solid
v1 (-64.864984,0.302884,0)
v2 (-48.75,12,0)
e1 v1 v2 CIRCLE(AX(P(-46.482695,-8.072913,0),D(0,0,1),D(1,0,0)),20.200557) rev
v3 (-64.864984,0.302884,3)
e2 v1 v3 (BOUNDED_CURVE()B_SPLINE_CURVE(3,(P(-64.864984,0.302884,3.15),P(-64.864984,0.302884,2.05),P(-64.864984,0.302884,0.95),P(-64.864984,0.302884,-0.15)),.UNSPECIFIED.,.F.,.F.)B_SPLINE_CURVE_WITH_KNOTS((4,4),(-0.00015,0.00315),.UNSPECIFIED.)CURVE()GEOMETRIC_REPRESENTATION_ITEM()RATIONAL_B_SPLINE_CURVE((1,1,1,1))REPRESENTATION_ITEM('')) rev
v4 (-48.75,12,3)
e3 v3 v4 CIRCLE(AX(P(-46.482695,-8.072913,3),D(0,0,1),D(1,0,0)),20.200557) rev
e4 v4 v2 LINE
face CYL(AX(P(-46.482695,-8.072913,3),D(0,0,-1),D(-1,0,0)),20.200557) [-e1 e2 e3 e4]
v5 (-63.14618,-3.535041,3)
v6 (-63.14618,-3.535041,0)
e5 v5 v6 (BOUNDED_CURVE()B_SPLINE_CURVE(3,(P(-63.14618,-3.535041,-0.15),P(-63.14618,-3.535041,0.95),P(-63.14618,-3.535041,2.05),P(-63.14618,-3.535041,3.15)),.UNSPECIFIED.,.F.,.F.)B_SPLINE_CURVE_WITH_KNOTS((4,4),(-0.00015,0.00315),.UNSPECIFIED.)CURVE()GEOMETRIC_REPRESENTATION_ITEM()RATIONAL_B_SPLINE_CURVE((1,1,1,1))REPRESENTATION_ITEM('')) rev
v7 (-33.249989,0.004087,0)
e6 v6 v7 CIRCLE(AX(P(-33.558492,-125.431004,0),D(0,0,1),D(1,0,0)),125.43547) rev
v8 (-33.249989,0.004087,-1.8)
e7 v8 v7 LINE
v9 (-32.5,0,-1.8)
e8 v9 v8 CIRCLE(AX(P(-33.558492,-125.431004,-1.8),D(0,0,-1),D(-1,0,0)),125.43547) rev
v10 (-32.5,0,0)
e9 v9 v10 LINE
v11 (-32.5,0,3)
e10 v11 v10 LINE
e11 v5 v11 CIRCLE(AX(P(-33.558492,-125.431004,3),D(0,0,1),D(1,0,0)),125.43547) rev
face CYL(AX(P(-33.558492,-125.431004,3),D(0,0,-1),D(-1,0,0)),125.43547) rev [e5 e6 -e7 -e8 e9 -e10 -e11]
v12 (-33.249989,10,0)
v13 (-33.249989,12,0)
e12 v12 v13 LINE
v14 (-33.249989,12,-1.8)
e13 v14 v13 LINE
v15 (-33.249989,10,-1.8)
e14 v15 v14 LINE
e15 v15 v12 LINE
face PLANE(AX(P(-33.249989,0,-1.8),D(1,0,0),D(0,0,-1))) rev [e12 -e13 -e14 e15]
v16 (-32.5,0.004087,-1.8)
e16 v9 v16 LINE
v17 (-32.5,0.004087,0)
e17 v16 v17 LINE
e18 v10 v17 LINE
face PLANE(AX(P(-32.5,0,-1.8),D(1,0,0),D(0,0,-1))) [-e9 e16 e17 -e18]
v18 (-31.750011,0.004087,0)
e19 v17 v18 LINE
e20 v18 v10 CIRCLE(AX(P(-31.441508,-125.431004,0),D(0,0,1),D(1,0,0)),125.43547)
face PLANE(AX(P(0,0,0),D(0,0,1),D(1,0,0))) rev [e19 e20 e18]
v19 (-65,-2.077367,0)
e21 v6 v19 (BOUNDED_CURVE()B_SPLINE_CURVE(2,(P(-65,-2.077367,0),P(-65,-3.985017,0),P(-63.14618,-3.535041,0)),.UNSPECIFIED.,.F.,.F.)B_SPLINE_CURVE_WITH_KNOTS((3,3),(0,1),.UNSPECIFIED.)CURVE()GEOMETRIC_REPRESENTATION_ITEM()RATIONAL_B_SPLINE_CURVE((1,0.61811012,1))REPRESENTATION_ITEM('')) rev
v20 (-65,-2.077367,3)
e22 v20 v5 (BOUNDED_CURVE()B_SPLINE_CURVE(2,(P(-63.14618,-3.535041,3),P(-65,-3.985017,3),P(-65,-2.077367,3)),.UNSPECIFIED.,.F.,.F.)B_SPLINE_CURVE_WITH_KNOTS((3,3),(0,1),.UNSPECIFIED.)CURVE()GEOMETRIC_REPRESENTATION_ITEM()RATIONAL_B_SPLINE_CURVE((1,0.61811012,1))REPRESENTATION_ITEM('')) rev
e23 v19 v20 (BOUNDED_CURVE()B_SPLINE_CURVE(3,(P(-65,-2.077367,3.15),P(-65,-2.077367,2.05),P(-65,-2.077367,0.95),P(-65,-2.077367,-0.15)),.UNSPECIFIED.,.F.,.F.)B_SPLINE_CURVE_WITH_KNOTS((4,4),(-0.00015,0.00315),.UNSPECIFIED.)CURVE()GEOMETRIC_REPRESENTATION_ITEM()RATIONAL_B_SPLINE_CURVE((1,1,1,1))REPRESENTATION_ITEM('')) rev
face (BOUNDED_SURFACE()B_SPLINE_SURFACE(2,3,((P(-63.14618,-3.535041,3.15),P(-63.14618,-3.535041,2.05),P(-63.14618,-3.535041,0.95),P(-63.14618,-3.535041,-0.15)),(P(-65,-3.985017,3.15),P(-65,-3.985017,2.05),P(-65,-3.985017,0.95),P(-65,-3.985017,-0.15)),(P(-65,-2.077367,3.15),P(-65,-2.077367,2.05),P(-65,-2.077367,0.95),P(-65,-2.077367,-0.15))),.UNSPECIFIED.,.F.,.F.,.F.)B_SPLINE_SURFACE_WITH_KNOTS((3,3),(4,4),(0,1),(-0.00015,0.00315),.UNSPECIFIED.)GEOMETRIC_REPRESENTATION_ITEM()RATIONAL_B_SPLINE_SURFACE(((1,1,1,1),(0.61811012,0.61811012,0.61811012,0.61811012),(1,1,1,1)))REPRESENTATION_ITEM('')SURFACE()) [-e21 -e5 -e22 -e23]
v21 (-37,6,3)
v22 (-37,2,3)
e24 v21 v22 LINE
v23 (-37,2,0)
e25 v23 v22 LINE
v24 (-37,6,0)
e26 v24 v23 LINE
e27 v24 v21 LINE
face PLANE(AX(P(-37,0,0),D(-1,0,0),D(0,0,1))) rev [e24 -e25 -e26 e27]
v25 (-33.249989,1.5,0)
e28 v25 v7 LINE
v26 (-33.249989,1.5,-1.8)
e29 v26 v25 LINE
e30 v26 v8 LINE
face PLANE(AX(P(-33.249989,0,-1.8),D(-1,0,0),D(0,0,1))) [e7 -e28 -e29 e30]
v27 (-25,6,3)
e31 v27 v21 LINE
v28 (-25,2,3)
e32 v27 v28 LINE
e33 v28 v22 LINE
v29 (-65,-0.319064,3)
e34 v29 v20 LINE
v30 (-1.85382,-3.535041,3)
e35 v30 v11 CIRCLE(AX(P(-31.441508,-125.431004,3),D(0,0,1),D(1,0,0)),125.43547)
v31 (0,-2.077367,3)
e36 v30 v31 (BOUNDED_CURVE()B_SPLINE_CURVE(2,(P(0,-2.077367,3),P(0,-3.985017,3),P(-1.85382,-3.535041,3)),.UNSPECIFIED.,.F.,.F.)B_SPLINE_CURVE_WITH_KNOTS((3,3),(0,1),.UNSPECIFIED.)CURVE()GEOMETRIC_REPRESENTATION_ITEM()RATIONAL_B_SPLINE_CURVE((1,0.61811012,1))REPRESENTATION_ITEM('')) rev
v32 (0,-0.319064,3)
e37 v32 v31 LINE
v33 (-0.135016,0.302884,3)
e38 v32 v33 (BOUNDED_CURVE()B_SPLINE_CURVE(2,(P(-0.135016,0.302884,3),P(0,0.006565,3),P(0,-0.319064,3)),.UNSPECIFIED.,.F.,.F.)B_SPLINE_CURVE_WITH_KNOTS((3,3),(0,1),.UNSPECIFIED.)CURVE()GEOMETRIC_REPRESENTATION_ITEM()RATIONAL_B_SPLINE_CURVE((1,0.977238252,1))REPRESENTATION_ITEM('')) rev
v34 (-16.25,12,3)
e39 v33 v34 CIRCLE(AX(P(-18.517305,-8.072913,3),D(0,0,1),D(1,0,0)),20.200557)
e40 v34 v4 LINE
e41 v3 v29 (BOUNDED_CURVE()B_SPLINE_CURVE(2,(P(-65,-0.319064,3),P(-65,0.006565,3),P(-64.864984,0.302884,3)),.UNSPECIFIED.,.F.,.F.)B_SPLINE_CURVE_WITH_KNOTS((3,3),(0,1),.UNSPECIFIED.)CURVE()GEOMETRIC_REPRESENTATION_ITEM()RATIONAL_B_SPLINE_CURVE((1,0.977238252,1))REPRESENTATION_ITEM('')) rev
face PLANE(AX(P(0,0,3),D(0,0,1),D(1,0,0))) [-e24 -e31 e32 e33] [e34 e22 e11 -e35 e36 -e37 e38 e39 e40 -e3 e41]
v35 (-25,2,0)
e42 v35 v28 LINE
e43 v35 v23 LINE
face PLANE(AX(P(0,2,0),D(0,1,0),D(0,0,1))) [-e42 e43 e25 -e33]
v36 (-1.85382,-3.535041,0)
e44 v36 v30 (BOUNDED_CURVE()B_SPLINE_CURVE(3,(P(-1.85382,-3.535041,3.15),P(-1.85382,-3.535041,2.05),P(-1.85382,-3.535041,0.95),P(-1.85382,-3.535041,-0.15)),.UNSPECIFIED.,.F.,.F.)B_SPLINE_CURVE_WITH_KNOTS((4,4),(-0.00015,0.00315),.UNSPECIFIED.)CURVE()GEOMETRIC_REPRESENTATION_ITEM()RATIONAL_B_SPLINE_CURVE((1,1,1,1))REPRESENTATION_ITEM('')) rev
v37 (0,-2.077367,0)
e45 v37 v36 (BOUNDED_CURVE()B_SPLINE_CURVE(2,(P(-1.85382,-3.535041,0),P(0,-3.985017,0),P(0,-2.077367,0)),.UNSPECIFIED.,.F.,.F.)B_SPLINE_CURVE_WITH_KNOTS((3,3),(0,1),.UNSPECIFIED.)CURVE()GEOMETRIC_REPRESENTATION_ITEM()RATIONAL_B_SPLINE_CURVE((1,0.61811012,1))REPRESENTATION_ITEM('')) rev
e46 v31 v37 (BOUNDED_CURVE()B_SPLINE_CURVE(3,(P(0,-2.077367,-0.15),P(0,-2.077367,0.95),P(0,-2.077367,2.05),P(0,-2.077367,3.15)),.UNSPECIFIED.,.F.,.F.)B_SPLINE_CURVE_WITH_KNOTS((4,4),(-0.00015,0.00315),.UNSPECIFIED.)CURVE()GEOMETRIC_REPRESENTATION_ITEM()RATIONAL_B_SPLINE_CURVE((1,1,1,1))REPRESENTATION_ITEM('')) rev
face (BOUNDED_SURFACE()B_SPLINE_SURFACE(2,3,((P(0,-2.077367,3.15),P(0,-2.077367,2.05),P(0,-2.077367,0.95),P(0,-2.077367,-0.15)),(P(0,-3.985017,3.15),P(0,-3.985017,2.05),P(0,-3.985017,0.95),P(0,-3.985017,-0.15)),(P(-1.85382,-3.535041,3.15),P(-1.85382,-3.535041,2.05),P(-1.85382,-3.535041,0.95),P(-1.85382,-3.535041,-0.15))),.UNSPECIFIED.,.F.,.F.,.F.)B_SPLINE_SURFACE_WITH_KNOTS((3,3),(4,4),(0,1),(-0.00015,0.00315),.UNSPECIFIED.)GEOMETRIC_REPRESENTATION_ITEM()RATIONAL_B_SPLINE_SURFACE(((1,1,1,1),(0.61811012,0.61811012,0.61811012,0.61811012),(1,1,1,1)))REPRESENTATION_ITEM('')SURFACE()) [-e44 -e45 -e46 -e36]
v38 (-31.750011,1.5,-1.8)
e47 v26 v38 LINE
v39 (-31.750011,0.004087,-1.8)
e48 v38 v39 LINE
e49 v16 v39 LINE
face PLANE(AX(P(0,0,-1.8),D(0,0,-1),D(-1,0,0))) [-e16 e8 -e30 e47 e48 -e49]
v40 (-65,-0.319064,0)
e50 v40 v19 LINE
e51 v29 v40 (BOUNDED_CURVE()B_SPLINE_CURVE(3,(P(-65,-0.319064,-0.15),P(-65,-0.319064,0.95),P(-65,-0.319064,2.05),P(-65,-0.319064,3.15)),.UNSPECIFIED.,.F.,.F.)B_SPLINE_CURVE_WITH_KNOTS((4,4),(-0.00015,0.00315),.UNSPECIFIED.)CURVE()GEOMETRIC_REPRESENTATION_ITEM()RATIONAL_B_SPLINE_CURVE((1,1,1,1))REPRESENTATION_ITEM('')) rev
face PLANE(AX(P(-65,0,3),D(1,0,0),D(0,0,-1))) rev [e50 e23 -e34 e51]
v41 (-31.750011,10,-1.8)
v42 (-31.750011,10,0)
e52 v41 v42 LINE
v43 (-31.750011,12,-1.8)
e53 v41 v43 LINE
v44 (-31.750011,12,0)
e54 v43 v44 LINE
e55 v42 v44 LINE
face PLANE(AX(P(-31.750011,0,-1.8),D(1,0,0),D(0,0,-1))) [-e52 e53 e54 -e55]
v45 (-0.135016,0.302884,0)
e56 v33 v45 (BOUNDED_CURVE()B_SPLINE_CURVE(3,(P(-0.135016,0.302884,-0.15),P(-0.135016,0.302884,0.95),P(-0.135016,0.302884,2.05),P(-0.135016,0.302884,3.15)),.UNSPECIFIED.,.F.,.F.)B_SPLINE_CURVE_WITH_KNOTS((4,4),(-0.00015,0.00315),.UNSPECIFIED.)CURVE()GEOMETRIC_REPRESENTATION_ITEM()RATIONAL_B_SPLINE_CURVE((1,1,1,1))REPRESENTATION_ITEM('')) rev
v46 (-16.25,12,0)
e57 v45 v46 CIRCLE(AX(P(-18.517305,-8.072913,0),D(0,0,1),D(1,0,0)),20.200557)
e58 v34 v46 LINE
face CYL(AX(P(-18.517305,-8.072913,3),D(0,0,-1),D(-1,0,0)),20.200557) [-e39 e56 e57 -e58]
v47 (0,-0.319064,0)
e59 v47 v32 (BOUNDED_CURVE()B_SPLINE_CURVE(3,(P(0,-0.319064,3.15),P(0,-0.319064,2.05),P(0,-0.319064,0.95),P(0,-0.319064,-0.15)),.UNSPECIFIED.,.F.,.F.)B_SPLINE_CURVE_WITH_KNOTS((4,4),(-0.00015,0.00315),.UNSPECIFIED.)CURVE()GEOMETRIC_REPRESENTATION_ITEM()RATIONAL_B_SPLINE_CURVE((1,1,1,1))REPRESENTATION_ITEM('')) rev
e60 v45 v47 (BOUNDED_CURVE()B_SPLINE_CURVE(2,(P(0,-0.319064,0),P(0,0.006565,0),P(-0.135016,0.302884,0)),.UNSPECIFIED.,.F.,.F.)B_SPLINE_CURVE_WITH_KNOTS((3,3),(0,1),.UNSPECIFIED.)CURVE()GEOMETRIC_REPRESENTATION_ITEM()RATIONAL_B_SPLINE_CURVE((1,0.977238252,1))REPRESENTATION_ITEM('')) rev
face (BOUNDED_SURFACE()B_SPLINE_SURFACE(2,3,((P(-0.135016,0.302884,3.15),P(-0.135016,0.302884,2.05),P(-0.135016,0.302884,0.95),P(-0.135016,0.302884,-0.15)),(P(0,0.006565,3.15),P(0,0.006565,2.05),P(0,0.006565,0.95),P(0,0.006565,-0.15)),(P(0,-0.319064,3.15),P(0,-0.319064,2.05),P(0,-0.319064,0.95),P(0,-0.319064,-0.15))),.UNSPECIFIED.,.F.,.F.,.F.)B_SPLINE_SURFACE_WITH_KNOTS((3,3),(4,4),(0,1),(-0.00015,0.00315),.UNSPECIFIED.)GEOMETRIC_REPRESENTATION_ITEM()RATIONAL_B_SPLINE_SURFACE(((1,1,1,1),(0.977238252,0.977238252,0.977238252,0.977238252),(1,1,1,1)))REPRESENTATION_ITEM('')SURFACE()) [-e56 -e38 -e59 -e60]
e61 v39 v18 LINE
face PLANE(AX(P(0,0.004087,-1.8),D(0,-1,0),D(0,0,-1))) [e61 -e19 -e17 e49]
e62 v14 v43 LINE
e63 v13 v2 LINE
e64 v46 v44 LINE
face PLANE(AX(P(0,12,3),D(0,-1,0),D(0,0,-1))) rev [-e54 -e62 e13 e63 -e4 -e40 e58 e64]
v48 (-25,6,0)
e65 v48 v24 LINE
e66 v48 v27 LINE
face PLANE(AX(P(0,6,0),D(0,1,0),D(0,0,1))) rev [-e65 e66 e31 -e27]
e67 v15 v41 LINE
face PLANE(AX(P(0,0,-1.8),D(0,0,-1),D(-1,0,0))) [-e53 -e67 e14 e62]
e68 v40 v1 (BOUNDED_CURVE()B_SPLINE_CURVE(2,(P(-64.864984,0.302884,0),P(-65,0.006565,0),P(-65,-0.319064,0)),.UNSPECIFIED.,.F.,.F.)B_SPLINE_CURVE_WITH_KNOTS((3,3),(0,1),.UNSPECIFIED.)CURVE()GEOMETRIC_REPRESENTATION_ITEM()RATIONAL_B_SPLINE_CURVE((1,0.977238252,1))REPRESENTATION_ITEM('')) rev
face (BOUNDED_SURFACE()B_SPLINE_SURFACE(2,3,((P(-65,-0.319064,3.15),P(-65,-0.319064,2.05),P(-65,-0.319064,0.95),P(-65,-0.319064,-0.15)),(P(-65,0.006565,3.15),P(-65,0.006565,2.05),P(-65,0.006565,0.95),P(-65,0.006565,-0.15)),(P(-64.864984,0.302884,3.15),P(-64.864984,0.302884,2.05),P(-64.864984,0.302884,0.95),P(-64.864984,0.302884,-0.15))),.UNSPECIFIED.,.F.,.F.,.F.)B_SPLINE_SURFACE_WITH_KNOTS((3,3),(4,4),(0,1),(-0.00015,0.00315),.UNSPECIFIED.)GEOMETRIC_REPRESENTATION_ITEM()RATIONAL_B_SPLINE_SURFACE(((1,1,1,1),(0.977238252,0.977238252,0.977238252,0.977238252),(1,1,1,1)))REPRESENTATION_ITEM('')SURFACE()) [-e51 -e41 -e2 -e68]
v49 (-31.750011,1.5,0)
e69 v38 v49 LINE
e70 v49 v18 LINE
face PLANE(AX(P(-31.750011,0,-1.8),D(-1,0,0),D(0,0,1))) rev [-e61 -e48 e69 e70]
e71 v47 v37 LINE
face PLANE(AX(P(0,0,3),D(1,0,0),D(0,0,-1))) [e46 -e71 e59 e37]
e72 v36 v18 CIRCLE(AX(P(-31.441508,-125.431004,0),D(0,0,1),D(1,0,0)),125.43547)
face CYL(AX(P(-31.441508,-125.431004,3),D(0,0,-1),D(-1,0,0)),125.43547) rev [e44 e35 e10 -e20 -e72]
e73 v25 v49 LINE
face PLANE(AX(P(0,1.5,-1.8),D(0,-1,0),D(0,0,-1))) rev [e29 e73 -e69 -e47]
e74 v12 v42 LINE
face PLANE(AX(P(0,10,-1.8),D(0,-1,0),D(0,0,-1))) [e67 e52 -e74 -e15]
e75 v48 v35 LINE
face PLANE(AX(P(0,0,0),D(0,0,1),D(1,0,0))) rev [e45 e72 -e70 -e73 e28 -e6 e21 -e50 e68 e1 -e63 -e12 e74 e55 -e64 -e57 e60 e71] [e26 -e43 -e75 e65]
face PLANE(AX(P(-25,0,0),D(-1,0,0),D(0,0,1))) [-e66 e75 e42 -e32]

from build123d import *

# Parameters (mm, degrees)
BOSS_EXTRUDE1_DEPTH     = 3
CUT_EXTRUDE1_DEPTH      = 67.166456759
CUT_EXTRUDE1_DEPTH_BACK = 67.166456759
SKETCH2_W               = 12
SKETCH2_H               = 4
VARFILLET1_R            = 1.5
BOSS_EXTRUDE2_START     = 1.8
SKETCH3_W               = 1.49997773
SKETCH3_H               = 2
BOSS_EXTRUDE2_DEPTH     = 1.8


with BuildPart() as part:
    # Sketch1 → Boss-Extrude1 (new body)
    with BuildSketch(Plane.XY):
        with BuildLine():
            Line((0, -4), (0, 0))
            ThreePointArc((0, 0), (-6.517304845, 8.177087189), (-16.25, 12))
            Line((-16.25, 12), (-48.75, 12))
            ThreePointArc((-48.75, 12), (-58.482695155, 8.177087189), (-65, 0))
            Line((-65, 0), (-65, -4))
            ThreePointArc((-65, -4), (-48.881086926, -0.934918729), (-32.5, 0))
            ThreePointArc((-32.5, 0), (-16.118913074, -0.934918729), (0, -4))
        make_face()
    extrude(amount=BOSS_EXTRUDE1_DEPTH)

    # Sketch2 → Cut-Extrude1 (cut, two sides: drawn at the far end of the back side and taken through both)
    with BuildSketch(Plane.XY.offset(3).offset(-CUT_EXTRUDE1_DEPTH_BACK)):
        with Locations((-31, 4)):
            Rectangle(SKETCH2_W, SKETCH2_H)
    extrude(amount=CUT_EXTRUDE1_DEPTH + CUT_EXTRUDE1_DEPTH_BACK, mode=Mode.SUBTRACT)

    # VarFillet1
    varfillet1_edges = [part.edges().sort_by_distance(p)[0] for p in [
        (-65, -4, 1.5),
        (-65, 0, 1.5),
        (0, -4, 1.5),
        (0, 0, 1.5),
    ]]
    fillet(varfillet1_edges, radius=VARFILLET1_R)

    # Sketch3 → Boss-Extrude2 (add)
    with BuildSketch(Plane(origin=(0, 0, 0), x_dir=(-1, 0, 0), z_dir=(0, 0, -1)).offset(BOSS_EXTRUDE2_START)):
        with BuildLine():
            Line((32.5, 0.004086765), (32.5, 0))
            ThreePointArc((32.5, 0), (32.874991378, 0.002603923), (33.249988865, 0.004086765))
            Line((33.249988865, 0.004086765), (33.249988865, 1.5))
            Line((33.249988865, 1.5), (31.750011135, 1.5))
            Line((31.750011135, 1.5), (31.750011135, 0.004086765))
            Line((31.750011135, 0.004086765), (32.5, 0.004086765))
        make_face()
        with Locations((32.5, 11)):
            Rectangle(SKETCH3_W, SKETCH3_H)
    extrude(amount=-BOSS_EXTRUDE2_DEPTH)


solid = part.part
